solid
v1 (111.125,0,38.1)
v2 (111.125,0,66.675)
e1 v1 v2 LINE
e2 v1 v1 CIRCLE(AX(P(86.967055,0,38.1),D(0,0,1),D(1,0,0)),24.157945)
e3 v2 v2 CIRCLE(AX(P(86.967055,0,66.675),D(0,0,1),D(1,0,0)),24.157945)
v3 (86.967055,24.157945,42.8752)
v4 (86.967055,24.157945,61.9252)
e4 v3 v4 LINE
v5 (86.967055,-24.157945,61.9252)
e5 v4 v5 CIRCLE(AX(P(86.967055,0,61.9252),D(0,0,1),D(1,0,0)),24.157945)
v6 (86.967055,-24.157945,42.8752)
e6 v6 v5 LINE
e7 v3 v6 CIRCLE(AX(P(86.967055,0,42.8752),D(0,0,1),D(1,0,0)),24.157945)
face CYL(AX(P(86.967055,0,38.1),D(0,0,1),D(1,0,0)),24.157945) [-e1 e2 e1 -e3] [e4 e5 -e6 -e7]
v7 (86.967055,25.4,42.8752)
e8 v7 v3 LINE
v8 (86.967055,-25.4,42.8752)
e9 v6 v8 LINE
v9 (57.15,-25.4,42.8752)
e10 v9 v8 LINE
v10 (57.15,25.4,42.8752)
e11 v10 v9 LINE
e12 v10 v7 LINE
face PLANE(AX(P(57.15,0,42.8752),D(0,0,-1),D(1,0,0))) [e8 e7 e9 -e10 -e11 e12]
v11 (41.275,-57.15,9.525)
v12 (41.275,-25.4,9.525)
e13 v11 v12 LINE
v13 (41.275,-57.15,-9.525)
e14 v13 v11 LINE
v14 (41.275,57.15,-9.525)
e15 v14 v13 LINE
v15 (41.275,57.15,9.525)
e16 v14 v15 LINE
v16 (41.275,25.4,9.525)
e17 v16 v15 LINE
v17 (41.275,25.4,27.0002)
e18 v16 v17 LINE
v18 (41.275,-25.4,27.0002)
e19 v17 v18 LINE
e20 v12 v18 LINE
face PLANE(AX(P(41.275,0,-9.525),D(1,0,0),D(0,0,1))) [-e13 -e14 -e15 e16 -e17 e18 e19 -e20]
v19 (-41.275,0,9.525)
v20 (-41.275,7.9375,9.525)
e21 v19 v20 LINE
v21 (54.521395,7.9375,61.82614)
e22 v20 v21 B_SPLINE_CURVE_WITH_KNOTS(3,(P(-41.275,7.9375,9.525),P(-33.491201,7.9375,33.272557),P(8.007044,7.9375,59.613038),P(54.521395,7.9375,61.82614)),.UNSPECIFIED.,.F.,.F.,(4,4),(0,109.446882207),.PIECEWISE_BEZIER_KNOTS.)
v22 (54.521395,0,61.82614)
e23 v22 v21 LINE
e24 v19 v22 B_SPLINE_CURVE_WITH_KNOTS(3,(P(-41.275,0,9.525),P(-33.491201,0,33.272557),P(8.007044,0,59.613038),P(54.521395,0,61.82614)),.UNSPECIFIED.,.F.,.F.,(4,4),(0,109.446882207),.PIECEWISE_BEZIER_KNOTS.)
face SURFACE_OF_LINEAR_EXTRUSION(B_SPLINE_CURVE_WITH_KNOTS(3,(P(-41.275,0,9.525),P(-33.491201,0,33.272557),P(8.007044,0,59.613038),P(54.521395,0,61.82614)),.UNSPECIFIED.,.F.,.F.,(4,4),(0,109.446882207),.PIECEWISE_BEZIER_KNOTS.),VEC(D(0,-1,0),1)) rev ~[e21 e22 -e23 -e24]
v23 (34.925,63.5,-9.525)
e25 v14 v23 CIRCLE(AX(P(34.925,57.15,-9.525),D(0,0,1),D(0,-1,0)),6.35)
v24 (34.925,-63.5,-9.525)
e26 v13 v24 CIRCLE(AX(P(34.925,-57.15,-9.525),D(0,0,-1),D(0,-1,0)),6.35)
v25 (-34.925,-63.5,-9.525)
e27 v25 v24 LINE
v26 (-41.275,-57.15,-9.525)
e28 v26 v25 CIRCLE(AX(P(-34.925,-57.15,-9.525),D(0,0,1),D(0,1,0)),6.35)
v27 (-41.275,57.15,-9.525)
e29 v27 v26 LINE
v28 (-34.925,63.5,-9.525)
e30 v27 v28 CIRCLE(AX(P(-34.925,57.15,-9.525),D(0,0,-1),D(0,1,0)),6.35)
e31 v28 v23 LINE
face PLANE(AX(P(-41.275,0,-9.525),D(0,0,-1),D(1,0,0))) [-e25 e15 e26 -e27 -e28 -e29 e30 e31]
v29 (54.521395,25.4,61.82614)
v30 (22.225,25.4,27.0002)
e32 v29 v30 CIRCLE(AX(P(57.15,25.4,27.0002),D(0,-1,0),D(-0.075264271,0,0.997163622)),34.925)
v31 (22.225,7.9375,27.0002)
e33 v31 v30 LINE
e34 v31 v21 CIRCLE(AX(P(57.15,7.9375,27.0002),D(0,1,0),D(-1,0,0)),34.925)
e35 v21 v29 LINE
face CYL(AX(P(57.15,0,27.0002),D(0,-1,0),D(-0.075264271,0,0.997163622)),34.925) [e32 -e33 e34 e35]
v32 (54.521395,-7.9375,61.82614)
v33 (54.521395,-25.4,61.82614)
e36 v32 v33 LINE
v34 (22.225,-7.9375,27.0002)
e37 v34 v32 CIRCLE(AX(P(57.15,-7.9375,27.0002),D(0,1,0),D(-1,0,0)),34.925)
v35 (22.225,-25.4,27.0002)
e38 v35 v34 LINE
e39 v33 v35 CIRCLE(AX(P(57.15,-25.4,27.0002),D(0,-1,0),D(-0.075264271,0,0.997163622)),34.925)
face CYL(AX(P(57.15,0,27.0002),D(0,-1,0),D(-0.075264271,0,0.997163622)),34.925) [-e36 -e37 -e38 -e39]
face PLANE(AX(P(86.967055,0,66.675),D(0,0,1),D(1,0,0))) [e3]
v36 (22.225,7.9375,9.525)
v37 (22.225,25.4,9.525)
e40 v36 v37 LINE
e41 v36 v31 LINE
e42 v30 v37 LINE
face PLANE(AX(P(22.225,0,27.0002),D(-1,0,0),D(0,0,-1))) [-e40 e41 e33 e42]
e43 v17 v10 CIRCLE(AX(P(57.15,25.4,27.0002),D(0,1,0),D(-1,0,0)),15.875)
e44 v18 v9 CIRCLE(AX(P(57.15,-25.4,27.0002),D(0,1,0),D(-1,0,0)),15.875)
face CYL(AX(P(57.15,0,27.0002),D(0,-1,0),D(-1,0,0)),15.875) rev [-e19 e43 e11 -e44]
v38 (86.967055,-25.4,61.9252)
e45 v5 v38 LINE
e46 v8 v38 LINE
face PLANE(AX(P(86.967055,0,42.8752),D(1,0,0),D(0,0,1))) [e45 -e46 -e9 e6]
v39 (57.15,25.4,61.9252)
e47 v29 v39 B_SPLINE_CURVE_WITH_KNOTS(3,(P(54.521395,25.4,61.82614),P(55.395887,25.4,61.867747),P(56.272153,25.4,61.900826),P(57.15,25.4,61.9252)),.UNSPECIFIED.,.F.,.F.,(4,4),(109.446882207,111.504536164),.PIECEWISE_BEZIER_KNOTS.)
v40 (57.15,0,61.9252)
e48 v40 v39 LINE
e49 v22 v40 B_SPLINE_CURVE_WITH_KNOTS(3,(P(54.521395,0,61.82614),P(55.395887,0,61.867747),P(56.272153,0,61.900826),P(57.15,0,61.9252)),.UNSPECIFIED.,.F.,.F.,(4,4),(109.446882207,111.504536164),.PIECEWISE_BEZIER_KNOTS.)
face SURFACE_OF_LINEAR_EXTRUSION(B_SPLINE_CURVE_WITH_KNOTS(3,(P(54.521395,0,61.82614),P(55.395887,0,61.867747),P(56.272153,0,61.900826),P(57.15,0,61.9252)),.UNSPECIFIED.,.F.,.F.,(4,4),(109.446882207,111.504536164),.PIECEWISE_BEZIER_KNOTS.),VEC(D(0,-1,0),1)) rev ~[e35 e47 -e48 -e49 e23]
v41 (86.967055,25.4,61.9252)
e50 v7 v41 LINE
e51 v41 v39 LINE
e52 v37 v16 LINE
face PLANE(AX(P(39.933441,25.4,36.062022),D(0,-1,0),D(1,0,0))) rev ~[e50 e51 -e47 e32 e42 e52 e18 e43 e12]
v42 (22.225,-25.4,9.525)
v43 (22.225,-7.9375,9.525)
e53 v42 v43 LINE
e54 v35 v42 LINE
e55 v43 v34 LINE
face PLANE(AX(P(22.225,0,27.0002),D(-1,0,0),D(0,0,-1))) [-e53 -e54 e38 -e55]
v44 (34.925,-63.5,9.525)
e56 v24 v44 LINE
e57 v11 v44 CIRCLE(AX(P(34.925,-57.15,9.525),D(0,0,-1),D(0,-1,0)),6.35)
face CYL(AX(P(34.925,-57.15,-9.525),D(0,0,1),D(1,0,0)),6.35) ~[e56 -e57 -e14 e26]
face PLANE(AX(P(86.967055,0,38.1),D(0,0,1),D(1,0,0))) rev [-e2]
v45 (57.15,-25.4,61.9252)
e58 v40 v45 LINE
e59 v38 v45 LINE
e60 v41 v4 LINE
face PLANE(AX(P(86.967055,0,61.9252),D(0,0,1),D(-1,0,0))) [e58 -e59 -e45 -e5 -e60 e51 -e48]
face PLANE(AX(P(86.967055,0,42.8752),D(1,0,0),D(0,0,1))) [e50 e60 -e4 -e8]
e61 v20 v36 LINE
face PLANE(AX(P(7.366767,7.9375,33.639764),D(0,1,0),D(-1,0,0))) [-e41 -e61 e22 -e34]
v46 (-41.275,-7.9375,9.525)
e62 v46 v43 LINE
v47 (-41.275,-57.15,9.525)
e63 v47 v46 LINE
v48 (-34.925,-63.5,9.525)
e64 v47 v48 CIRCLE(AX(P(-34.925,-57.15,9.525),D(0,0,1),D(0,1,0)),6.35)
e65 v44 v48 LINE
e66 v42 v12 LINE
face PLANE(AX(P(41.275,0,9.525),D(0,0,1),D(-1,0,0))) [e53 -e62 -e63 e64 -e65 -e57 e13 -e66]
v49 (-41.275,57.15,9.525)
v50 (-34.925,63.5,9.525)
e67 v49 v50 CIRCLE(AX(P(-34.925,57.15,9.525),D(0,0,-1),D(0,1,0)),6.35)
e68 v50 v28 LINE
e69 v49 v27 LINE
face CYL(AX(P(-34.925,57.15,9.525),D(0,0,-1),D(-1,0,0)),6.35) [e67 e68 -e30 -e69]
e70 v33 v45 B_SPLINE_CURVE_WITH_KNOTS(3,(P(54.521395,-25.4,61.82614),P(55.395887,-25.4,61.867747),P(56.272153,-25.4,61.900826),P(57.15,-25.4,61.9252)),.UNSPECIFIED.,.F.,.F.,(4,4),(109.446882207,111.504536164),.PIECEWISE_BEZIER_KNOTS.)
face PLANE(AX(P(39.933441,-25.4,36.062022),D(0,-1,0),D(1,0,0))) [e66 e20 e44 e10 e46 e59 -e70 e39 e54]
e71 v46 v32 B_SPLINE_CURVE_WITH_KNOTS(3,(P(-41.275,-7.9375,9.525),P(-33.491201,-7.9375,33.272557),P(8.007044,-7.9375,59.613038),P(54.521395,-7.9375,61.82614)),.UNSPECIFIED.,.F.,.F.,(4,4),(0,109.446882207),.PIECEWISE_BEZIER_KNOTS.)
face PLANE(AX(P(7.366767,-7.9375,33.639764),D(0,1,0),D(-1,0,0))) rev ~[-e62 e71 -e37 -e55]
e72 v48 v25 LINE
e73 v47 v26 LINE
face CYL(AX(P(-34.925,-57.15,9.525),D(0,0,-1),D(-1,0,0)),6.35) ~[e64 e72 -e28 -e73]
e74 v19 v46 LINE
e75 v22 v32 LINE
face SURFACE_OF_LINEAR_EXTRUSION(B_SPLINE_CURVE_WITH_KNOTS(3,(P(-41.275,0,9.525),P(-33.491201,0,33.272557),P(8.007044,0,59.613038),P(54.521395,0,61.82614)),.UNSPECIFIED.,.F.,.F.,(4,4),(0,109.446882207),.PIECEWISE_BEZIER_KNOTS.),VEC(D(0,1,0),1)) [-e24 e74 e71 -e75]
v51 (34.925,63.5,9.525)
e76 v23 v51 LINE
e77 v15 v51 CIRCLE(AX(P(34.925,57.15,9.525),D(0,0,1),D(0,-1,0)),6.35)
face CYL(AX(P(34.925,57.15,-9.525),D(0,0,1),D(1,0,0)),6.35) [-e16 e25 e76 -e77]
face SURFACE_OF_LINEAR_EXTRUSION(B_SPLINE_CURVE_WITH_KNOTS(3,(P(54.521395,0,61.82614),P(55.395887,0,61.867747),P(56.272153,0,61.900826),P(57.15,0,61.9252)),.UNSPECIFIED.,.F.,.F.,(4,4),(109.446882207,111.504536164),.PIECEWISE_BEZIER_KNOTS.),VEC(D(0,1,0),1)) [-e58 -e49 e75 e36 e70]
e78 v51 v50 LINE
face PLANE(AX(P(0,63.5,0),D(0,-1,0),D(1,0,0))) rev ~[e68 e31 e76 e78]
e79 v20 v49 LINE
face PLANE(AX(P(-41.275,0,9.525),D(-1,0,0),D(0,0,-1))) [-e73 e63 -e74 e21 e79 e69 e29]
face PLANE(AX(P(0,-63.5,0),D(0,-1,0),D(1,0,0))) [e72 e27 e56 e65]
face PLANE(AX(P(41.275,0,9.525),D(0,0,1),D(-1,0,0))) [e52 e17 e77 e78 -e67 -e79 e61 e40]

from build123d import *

# Parameters (mm, degrees)
F1_DEPTH = 63.5
F0_W     = 26.6420548012
F0_H     = 19.05
F2_DEPTH = 25.4
F3_DEPTH = 7.9375
F5_R     = 6.35


# Not quite as in the source:
# - a feature of the source that left no trace in its solid (it failed there, or was rolled back) is left out


with BuildPart() as f1:
    # F0 (on Front) → F1 (new body, symmetric)
    with BuildSketch(Plane.XZ):
        Polygon((-41.275, 9.525), (-41.275, -9.525), (41.275, -9.525), (41.275, 9.525), (22.225, 9.525), align=None)
    extrude(amount=F1_DEPTH, both=True)

    # F0 (on Front) → F2 (join, symmetric)
    with BuildSketch(Plane.XZ):
        with BuildLine():
            Line((22.225, 9.525), (41.275, 9.525))
            Line((41.275, 9.525), (41.275, 27.0002))
            ThreePointArc((41.275, 27.0002), (45.9246798487, 38.2255201513), (57.15, 42.8752))
            Line((57.15, 42.8752), (60.325, 42.8752))
            Line((60.325, 42.8752), (60.325, 61.9252))
            Line((60.325, 61.9252), (57.15, 61.9252))
            add(Edge.make_bspline(
                [(54.5213953348, 61.8261395066), (55.3958874756, 61.867746875), (56.2721525992, 61.9008262266), (57.15, 61.9252)],
                knots=[109.4468822065, 109.4468822065, 109.4468822065, 109.4468822065, 111.5045361635, 111.5045361635, 111.5045361635, 111.5045361635], degree=3))
            ThreePointArc((54.5213953348, 61.8261395066), (31.5418016747, 50.7483747411), (22.225, 27.0002))
            Line((22.225, 27.0002), (22.225, 9.525))
        make_face()
        with Locations((73.6460274006, 52.4002)):
            Rectangle(F0_W, F0_H)
    extrude(amount=F2_DEPTH, both=True)

    # F0 (on Front) → F3 (join, symmetric)
    with BuildSketch(Plane.XZ):
        with BuildLine():
            add(Edge.make_bspline(
                [(-41.275, 9.525), (-33.4912011652, 33.272556952), (8.0070443726, 59.6130381539), (54.5213953348, 61.8261395066)],
                knots=[0, 0, 0, 0, 109.4468822065, 109.4468822065, 109.4468822065, 109.4468822065], degree=3))
            Line((-41.275, 9.525), (22.225, 9.525))
            Line((22.225, 9.525), (22.225, 27.0002))
            ThreePointArc((22.225, 27.0002), (31.5418016747, 50.7483747411), (54.5213953348, 61.8261395066))
        make_face()
    extrude(amount=F3_DEPTH, both=True)

    # F0 (on Front) → F4 (revolve)
    with BuildSketch(Plane.XZ):
        Polygon((86.9670548012, 66.675), (86.9670548012, 61.9252), (86.9670548012, 42.8752), (86.9670548012, 38.1), (111.125, 38.1), (111.125, 66.675), align=None)
    revolve(axis=Axis((86.9670548012, 0, 52.3875), (0, 0, 1)))

    # F5
    f5_edges = [f1.edges().sort_by_distance(p)[0] for p in [
        (-41.275, -63.5, 0),
        (41.275, -63.5, 0),
        (41.275, 63.5, 0),
        (-41.275, 63.5, 0),
    ]]
    fillet(f5_edges, radius=F5_R)


solid = f1.part
